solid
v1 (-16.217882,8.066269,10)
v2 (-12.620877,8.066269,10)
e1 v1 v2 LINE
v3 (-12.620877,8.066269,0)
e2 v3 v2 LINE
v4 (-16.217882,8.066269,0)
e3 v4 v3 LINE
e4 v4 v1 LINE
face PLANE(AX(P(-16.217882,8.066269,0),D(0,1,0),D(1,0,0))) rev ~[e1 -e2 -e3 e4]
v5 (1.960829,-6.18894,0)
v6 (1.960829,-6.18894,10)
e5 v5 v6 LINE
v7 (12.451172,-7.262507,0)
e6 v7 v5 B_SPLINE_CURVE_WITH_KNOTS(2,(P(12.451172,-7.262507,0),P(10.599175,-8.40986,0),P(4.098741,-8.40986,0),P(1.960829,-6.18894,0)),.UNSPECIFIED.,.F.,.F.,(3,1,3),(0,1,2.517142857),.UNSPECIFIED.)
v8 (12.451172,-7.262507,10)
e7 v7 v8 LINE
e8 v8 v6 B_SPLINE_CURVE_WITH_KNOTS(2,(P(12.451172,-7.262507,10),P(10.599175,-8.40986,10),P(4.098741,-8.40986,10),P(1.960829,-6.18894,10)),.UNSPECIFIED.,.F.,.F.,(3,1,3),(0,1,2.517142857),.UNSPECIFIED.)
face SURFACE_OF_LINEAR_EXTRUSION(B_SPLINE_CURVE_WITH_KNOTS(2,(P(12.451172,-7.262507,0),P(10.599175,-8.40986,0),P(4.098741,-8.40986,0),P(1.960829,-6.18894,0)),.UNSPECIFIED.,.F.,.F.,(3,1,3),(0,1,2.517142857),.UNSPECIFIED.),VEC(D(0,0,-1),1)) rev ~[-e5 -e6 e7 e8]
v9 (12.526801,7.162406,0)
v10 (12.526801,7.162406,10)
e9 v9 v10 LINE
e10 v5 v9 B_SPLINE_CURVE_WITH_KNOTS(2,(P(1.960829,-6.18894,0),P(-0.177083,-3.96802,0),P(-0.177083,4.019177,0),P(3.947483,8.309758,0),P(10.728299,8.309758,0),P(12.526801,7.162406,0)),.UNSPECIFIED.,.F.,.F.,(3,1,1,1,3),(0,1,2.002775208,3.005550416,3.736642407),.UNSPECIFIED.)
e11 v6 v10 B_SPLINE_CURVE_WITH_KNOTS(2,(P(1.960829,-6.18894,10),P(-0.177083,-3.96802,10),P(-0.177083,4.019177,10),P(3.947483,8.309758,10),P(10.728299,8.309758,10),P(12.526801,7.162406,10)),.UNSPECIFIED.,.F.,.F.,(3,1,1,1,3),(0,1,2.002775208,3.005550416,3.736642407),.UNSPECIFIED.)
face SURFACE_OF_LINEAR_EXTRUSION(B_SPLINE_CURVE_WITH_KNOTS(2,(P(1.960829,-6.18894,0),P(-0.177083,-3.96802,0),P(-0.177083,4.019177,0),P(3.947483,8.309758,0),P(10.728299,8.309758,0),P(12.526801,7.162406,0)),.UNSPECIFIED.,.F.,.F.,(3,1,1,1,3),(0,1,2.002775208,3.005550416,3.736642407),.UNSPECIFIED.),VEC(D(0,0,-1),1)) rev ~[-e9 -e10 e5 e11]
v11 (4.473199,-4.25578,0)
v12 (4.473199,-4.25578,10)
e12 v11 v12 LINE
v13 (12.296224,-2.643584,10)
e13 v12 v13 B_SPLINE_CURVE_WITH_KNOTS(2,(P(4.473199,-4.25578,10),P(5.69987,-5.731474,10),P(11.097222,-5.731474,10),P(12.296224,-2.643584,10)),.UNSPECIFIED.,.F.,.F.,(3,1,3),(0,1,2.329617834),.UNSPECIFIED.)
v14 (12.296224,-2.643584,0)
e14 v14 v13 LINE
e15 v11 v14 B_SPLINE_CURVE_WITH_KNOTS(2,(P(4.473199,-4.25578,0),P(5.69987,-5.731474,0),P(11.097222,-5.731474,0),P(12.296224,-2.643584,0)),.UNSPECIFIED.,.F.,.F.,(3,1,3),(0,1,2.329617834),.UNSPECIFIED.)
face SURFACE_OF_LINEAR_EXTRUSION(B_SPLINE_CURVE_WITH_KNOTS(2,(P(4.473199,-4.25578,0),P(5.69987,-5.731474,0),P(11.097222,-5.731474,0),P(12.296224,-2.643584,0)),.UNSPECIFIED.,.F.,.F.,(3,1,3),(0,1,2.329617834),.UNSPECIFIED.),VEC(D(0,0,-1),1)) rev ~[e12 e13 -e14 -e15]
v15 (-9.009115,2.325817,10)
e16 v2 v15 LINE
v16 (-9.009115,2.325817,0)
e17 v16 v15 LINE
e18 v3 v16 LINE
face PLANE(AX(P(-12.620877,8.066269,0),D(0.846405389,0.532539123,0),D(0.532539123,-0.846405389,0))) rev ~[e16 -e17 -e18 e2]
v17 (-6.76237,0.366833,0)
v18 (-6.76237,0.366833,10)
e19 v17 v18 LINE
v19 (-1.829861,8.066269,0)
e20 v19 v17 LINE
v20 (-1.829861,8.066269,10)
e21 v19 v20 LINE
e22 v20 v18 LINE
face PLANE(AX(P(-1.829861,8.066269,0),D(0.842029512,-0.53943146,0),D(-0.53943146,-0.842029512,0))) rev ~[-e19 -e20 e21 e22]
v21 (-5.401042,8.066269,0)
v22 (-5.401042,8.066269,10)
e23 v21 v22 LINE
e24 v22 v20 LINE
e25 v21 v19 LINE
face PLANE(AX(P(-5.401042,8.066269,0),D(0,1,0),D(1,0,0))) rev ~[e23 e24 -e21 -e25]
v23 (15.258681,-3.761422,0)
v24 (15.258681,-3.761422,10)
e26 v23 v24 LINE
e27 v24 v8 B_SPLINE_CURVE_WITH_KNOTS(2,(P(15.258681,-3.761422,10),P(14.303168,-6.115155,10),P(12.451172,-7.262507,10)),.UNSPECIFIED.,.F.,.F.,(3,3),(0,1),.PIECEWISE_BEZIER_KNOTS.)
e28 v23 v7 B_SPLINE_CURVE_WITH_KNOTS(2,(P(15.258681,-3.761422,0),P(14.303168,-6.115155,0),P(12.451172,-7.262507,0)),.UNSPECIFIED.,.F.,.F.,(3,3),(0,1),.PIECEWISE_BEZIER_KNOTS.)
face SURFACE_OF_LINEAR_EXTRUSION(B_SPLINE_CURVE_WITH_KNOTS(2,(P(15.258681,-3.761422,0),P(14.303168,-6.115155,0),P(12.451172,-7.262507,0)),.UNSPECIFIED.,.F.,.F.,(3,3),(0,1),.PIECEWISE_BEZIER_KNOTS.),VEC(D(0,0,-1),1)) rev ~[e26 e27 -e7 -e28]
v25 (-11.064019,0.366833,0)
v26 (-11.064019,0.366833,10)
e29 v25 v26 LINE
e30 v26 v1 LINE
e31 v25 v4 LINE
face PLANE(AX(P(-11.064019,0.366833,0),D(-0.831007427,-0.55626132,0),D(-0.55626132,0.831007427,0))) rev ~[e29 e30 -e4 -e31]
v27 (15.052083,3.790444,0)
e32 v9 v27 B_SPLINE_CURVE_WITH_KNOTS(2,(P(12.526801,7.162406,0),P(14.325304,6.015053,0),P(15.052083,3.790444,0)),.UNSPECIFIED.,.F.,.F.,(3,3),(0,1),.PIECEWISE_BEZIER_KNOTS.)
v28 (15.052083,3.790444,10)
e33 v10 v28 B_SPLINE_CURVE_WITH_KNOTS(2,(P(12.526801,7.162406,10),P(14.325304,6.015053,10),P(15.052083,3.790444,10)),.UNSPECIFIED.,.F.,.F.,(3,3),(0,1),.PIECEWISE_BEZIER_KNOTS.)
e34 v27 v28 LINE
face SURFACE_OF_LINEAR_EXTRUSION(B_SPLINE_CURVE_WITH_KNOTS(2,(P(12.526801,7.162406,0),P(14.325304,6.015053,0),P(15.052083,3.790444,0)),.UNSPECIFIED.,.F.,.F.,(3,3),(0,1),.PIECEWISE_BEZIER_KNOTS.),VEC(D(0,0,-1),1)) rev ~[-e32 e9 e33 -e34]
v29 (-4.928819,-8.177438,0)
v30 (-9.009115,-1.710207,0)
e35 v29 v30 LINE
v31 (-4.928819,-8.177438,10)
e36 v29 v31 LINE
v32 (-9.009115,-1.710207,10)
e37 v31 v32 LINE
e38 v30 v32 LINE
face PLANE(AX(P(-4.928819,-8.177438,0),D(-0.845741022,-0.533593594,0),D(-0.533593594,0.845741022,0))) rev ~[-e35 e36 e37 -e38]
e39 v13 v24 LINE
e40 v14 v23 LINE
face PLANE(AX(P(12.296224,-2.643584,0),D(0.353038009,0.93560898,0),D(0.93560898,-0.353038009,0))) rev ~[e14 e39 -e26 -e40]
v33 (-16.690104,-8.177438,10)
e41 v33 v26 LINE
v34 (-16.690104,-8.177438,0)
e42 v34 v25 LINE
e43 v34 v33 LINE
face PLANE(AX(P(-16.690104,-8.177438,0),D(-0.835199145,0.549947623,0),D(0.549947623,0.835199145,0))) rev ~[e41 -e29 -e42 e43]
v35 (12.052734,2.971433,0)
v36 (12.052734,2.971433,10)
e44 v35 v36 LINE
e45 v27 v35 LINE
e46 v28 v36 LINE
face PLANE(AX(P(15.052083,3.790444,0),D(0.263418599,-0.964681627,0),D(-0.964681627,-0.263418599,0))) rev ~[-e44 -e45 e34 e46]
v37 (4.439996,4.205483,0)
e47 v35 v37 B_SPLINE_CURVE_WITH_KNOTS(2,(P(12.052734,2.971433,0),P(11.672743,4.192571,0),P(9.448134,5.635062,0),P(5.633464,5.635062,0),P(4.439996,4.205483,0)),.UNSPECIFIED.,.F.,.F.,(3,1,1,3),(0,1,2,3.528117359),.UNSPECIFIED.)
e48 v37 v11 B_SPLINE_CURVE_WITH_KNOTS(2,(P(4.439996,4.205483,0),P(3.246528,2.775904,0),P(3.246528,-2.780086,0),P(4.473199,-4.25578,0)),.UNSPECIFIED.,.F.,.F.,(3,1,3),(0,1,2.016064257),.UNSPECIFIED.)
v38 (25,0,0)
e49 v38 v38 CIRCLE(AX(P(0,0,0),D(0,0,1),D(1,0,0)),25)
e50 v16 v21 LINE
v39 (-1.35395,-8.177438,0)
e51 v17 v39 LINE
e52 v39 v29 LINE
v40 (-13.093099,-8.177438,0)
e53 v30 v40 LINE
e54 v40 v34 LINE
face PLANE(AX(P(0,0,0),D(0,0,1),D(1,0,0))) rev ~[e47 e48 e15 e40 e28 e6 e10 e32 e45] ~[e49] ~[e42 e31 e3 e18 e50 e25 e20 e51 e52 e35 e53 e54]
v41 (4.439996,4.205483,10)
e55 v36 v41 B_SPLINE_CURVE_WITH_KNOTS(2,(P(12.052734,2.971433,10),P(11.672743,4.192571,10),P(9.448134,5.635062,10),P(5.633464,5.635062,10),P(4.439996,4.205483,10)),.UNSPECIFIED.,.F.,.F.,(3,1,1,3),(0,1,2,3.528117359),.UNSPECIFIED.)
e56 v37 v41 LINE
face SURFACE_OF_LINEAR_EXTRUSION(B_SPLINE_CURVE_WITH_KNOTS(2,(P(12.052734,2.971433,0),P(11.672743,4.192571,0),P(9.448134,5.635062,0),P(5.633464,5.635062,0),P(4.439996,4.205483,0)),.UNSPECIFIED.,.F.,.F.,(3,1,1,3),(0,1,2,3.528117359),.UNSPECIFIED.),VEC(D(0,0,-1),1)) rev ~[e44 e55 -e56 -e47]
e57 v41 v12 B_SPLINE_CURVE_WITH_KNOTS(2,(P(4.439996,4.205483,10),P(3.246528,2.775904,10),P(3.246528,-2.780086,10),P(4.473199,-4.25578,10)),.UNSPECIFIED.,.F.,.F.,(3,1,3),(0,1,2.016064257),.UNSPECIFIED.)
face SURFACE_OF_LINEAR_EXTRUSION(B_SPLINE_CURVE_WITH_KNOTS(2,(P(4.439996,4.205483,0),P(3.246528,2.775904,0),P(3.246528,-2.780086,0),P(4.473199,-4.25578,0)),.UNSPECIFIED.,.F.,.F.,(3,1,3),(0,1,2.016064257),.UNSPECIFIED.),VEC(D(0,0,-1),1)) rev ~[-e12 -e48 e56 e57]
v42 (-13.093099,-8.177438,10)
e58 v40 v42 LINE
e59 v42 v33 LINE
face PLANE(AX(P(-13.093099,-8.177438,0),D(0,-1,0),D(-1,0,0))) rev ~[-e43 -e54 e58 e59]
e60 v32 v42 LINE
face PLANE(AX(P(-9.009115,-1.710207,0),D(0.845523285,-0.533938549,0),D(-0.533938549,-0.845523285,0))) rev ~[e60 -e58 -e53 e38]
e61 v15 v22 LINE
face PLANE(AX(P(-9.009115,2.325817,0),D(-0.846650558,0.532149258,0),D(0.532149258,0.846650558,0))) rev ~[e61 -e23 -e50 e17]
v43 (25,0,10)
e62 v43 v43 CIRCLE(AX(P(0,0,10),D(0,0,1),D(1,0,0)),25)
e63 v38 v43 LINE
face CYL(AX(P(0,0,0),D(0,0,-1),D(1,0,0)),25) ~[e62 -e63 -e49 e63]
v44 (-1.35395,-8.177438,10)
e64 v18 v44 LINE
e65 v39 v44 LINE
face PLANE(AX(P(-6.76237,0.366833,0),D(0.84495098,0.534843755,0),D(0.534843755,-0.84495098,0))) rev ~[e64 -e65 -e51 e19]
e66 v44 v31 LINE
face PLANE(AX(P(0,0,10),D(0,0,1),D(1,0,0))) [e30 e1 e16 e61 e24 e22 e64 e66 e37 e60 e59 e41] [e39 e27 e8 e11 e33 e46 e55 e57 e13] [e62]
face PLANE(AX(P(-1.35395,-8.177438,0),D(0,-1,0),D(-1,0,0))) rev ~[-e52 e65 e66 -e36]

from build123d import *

# Parameters (mm, degrees)
F0_R     = 25
F1_DEPTH = 10


with BuildPart() as f1:
    # F0 (on Top) → F1 (new body)
    with BuildSketch(Plane.XY):
        Circle(F0_R)
        Polygon((-1.3539496528, -8.1774380319), (-4.9288194444, -8.1774380319), (-9.0091145833, -1.7102071291), (-13.0930989583, -8.1774380319), (-16.6901041667, -8.1774380319), (-11.0640190972, 0.3668328015), (-16.2178819444, 8.0662685653), (-12.6208767361, 8.0662685653), (-9.0091145833, 2.3258171765), (-5.4010416667, 8.0662685653), (-1.8298611111, 8.0662685653), (-6.7623697917, 0.3668328015), align=None, mode=Mode.SUBTRACT)
        with BuildLine():
            add(Edge.make_bspline(
                [(4.4731987847, -4.2557800458), (5.6998697917, -5.7314744902), (8.0167100694, -5.7314744902)],
                knots=[0, 0, 0, 1, 1, 1], degree=2))
            add(Edge.make_bspline(
                [(8.0167100694, -5.7314744902), (11.0972222222, -5.7314744902), (12.2962239583, -2.6435838652)],
                knots=[0, 0, 0, 1, 1, 1], degree=2))
            Line((12.2962239583, -2.6435838652), (15.2586805556, -3.7614224069))
            add(Edge.make_bspline(
                [(15.2586805556, -3.7614224069), (14.3031684028, -6.1151550458), (12.451171875, -7.2625074763)],
                knots=[0, 0, 0, 1, 1, 1], degree=2))
            add(Edge.make_bspline(
                [(12.451171875, -7.2625074763), (10.5991753472, -8.4098599069), (8.0167100694, -8.4098599069)],
                knots=[0, 0, 0, 1, 1, 1], degree=2))
            add(Edge.make_bspline(
                [(8.0167100694, -8.4098599069), (4.0987413194, -8.4098599069), (1.9608289931, -6.188939768)],
                knots=[0, 0, 0, 1, 1, 1], degree=2))
            add(Edge.make_bspline(
                [(1.9608289931, -6.188939768), (-0.1770833333, -3.9680196291), (-0.1770833333, 0.020044607)],
                knots=[0, 0, 0, 1, 1, 1], degree=2))
            add(Edge.make_bspline(
                [(-0.1770833333, 0.020044607), (-0.1770833333, 4.0191765515), (1.8851996528, 6.1644673501)],
                knots=[0, 0, 0, 1, 1, 1], degree=2))
            add(Edge.make_bspline(
                [(1.8851996528, 6.1644673501), (3.9474826389, 8.3097581487), (7.869140625, 8.3097581487)],
                knots=[0, 0, 0, 1, 1, 1], degree=2))
            add(Edge.make_bspline(
                [(7.869140625, 8.3097581487), (10.7282986111, 8.3097581487), (12.5268012153, 7.1624057181)],
                knots=[0, 0, 0, 1, 1, 1], degree=2))
            add(Edge.make_bspline(
                [(12.5268012153, 7.1624057181), (14.3253038194, 6.0150532876), (15.0520833333, 3.7904439126)],
                knots=[0, 0, 0, 1, 1, 1], degree=2))
            Line((15.0520833333, 3.7904439126), (12.052734375, 2.9714334959))
            add(Edge.make_bspline(
                [(12.052734375, 2.9714334959), (11.6727430556, 4.1925706487), (10.5604383681, 4.9138163084)],
                knots=[0, 0, 0, 1, 1, 1], degree=2))
            add(Edge.make_bspline(
                [(10.5604383681, 4.9138163084), (9.4481336806, 5.6350619681), (7.9392361111, 5.6350619681)],
                knots=[0, 0, 0, 1, 1, 1], degree=2))
            add(Edge.make_bspline(
                [(7.9392361111, 5.6350619681), (5.6334635417, 5.6350619681), (4.4399956597, 4.2054829751)],
                knots=[0, 0, 0, 1, 1, 1], degree=2))
            add(Edge.make_bspline(
                [(4.4399956597, 4.2054829751), (3.2465277778, 2.775903982), (3.2465277778, 0.020044607)],
                knots=[0, 0, 0, 1, 1, 1], degree=2))
            add(Edge.make_bspline(
                [(3.2465277778, 0.020044607), (3.2465277778, -2.7800856013), (4.4731987847, -4.2557800458)],
                knots=[0, 0, 0, 1, 1, 1], degree=2))
        make_face(mode=Mode.SUBTRACT)
    extrude(amount=F1_DEPTH)


solid = f1.part
